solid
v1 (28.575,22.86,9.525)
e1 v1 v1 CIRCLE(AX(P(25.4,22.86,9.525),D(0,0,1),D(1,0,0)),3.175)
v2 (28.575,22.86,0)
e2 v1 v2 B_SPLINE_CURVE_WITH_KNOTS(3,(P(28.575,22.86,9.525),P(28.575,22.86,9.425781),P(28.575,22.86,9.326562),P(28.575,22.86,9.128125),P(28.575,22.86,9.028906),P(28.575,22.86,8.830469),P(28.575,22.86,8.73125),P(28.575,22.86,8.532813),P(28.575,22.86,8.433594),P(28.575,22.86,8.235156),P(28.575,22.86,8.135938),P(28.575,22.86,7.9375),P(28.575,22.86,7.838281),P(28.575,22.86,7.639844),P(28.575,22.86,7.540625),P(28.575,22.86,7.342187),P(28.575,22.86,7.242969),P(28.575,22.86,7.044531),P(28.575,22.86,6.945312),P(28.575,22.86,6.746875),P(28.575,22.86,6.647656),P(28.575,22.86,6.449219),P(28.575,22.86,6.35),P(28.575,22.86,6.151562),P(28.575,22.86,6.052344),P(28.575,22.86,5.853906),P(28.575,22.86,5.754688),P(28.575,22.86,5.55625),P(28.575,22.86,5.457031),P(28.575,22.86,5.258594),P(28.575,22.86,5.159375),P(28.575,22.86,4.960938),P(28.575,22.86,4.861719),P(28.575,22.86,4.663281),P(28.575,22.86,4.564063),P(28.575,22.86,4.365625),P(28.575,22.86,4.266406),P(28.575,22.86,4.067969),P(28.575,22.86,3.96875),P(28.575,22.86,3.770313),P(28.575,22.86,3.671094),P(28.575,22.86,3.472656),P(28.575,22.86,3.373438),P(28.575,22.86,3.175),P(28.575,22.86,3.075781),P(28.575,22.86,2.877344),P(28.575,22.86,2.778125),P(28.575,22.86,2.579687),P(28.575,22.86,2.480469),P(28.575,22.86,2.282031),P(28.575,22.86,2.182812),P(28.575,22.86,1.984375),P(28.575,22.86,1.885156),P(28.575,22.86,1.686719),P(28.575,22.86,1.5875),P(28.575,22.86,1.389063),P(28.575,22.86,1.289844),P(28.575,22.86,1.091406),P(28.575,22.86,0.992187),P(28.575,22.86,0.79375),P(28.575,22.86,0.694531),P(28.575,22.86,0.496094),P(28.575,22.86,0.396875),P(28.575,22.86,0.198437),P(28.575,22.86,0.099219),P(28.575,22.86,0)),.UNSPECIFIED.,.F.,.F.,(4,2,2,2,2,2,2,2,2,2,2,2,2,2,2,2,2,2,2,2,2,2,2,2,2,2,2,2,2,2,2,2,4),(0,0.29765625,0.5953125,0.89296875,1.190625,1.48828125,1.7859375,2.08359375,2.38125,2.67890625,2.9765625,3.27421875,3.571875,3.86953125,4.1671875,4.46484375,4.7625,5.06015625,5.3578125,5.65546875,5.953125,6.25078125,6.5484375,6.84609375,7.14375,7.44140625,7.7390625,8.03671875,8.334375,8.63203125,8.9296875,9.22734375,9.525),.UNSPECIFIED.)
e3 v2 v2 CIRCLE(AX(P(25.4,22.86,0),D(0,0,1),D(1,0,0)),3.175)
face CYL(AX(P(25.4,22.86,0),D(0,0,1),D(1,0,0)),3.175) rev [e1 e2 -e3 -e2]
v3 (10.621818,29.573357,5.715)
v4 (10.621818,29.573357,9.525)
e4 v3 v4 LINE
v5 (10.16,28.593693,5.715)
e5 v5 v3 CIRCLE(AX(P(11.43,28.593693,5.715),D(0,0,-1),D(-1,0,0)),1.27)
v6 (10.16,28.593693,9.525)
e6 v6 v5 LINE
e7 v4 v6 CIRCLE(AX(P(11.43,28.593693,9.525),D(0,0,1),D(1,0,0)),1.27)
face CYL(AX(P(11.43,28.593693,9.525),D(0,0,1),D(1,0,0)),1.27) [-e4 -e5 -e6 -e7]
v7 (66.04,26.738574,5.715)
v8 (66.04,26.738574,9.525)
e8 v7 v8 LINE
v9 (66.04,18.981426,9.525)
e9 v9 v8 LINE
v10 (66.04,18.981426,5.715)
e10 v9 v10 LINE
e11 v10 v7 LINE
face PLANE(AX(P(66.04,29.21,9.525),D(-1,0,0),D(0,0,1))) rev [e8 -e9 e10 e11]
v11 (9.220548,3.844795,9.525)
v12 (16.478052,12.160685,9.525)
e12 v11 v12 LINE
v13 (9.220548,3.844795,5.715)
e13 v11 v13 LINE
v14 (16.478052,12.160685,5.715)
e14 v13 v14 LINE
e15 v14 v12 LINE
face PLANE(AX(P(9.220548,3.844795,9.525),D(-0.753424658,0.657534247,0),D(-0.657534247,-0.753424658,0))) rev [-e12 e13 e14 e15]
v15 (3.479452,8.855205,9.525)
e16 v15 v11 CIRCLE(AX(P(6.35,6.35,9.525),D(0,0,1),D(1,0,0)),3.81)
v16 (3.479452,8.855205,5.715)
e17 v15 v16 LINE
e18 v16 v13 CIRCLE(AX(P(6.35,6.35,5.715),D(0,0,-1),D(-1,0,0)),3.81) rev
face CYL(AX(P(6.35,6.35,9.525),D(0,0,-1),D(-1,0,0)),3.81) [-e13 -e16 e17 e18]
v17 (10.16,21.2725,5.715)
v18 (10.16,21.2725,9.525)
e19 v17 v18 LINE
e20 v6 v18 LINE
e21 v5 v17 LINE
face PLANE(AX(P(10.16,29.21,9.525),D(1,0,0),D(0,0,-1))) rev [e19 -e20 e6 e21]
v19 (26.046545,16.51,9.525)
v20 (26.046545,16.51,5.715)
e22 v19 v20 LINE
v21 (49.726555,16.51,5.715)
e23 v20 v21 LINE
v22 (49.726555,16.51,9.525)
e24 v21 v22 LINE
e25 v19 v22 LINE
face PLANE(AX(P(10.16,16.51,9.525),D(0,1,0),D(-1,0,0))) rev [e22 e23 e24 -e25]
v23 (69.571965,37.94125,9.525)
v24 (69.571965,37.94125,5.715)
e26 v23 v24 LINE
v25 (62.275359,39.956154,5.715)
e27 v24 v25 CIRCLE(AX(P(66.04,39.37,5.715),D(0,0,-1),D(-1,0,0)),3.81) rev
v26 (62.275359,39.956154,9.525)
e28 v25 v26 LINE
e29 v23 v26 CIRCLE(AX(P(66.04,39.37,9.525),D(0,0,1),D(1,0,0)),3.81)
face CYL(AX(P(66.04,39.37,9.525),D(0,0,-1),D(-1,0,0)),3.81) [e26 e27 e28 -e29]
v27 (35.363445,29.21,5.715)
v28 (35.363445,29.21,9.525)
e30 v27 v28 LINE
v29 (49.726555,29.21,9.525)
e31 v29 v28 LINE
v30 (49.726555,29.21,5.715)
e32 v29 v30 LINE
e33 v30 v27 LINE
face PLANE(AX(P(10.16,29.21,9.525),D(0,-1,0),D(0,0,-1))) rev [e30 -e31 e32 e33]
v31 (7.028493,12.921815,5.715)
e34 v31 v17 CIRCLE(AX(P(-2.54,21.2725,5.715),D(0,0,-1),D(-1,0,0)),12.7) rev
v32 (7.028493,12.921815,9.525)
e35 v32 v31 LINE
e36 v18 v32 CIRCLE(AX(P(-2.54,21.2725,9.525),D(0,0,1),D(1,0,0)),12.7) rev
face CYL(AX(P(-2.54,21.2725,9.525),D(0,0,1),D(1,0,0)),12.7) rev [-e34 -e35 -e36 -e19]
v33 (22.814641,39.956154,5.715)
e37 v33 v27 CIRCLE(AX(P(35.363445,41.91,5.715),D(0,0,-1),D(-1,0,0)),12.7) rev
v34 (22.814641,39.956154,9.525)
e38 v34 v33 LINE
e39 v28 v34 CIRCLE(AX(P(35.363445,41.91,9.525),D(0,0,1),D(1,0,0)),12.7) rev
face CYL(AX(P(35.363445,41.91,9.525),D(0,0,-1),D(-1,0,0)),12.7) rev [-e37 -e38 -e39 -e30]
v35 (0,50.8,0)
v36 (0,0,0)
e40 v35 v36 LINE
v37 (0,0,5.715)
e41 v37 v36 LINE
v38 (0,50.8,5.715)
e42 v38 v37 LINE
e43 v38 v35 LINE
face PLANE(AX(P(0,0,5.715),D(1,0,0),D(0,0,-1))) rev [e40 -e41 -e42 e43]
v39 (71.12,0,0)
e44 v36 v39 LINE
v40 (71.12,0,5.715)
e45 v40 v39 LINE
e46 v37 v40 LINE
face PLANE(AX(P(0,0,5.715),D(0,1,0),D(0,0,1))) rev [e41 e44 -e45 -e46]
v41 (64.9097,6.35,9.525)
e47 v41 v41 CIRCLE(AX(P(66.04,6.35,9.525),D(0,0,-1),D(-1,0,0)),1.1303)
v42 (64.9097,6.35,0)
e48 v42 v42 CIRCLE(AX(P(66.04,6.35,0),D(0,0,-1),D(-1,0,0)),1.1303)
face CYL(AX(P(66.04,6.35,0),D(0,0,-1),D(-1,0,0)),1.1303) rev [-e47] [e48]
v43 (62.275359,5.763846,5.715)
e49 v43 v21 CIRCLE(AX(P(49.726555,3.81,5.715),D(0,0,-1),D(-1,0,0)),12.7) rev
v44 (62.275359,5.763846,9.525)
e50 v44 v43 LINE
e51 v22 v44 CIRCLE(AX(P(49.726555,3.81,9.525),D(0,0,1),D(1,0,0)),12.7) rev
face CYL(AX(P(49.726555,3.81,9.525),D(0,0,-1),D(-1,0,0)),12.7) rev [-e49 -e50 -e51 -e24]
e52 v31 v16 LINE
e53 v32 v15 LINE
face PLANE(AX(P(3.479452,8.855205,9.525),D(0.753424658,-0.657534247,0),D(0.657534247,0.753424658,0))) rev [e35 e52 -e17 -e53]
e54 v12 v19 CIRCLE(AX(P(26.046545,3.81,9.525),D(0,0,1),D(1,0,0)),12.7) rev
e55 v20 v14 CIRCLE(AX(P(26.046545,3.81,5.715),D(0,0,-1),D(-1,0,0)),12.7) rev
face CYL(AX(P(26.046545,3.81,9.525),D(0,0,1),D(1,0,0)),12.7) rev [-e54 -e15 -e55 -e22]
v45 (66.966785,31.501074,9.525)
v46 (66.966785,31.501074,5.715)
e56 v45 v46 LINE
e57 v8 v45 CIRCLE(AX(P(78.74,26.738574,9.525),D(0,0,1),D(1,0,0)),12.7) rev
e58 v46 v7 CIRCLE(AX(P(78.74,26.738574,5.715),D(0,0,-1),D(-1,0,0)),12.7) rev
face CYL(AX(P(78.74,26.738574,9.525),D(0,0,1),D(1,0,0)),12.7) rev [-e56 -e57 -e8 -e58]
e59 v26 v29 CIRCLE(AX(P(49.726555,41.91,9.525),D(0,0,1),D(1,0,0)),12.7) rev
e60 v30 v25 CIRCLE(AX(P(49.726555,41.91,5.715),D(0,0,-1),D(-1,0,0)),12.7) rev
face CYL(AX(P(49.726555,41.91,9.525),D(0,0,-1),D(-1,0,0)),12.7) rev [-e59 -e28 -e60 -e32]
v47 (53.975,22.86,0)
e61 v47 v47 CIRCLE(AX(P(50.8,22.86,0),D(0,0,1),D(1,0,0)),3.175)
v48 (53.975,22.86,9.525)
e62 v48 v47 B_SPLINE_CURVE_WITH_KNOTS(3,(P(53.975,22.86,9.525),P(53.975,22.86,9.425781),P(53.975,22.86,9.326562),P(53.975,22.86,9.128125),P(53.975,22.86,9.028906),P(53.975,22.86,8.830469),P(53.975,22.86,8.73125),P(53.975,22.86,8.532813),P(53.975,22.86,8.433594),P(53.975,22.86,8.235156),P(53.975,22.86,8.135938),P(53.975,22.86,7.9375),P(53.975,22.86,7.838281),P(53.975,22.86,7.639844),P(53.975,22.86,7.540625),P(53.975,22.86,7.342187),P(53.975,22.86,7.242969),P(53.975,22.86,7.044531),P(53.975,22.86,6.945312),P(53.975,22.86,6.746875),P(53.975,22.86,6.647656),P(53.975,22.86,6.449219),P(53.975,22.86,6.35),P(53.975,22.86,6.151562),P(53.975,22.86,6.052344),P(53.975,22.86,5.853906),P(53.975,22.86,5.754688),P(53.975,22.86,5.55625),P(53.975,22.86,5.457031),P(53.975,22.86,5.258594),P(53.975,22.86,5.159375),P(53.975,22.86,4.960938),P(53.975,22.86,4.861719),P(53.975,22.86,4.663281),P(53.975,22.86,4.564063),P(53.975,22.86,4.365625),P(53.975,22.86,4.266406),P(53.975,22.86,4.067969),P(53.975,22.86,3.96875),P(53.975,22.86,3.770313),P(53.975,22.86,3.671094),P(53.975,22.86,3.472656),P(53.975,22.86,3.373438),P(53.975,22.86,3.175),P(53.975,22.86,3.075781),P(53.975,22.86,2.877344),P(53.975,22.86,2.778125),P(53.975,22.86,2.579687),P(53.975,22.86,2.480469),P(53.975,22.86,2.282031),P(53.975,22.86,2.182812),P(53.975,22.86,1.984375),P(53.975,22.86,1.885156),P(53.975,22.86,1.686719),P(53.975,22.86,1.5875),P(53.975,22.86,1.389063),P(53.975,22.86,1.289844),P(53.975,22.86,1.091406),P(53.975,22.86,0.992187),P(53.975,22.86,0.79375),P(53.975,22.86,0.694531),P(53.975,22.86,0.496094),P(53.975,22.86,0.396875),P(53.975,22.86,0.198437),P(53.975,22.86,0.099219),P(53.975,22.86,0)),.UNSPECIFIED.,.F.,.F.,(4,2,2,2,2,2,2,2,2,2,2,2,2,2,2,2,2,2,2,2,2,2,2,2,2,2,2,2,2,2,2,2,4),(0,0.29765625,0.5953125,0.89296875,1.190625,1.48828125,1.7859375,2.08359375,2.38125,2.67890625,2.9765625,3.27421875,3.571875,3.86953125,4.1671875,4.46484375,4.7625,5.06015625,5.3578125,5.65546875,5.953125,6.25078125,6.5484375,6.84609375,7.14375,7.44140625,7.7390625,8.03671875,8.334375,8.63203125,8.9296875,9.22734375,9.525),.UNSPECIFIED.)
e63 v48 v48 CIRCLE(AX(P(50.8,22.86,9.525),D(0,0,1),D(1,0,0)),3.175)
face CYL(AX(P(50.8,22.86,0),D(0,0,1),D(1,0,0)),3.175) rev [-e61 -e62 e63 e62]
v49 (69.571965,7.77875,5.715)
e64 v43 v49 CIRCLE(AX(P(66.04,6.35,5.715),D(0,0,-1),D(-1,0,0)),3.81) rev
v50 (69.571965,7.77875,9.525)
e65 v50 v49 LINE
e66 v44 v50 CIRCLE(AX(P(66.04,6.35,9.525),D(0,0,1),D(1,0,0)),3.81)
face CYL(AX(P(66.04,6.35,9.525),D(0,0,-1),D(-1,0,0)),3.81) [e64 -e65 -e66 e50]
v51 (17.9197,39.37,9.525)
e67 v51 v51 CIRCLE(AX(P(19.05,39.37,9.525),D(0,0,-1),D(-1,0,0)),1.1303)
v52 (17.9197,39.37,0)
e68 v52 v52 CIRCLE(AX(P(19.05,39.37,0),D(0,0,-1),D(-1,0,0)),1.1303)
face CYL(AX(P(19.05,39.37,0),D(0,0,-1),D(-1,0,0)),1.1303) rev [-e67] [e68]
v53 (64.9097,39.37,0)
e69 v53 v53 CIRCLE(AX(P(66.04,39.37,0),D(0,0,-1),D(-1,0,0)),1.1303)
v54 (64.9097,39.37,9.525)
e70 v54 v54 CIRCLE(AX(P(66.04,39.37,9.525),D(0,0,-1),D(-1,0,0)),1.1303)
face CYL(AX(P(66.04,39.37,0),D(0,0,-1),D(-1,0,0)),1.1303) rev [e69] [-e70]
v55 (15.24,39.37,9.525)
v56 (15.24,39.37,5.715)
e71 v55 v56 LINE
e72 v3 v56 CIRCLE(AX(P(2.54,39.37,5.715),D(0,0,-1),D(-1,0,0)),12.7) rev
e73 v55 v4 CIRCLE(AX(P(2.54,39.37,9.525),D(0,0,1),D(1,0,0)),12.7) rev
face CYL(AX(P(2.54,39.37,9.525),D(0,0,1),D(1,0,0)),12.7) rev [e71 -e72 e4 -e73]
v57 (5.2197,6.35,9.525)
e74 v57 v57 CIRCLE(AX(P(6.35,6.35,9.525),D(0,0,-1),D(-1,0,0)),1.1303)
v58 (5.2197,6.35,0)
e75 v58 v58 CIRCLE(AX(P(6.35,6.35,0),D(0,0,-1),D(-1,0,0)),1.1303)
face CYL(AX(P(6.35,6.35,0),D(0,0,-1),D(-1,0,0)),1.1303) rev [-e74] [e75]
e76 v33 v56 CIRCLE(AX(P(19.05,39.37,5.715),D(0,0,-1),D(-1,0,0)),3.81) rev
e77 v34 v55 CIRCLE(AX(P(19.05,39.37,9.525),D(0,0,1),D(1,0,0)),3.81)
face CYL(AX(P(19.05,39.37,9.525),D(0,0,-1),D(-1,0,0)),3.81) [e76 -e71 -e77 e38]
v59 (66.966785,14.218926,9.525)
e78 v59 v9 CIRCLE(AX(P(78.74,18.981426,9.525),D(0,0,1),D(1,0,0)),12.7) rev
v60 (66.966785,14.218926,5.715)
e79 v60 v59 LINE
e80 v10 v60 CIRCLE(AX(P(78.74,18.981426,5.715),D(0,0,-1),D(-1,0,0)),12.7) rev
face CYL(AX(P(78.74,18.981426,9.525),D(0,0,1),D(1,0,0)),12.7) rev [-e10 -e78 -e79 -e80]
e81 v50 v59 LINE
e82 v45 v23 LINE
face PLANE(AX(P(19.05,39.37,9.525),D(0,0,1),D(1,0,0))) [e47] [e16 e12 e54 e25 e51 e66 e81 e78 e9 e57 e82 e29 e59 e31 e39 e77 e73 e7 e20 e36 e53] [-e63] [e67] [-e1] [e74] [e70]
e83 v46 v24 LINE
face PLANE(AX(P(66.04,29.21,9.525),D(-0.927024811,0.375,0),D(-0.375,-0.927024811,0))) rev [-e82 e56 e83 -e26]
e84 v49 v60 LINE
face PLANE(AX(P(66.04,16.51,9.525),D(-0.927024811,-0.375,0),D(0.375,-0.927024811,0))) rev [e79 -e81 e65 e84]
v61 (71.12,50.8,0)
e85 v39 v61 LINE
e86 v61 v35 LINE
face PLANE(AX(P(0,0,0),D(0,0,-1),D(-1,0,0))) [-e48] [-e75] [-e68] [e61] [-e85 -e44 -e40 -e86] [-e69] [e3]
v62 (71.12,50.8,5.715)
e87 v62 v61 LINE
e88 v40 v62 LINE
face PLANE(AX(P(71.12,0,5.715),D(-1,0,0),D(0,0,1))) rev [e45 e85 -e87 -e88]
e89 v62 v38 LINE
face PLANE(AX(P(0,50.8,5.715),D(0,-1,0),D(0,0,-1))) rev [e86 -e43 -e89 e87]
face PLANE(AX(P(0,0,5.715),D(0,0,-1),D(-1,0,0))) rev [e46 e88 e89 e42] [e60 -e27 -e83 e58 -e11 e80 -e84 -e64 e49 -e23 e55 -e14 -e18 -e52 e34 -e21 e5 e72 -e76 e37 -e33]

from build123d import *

# Parameters (mm, degrees)
SKETCH1_W               = 71.12
SKETCH1_H               = 50.8
BOSS_EXTRUDE1_DEPTH     = 5.715
SKETCH3_R               = 3.81
SKETCH3_W               = 55.88
SKETCH3_H               = 12.7
BOSS_EXTRUDE2_DEPTH     = 3.81
F_4_40_TAPPED_HOLE1_D   = 2.2606
BOSS_EXTRUDE4_DEPTH     = 3.81
FILLET1_R               = 12.7
FILLET2_R               = 1.27
CUT_EXTRUDE1_DEPTH      = 2.54
CUT_EXTRUDE1_DEPTH_BACK = 88.917120204
SKETCH9_R               = 3.175


with BuildPart() as part:
    # Sketch1 → Boss-Extrude1 (new body)
    with BuildSketch(Plane.XY):
        with Locations((35.56, 25.4)):
            Rectangle(SKETCH1_W, SKETCH1_H)
    extrude(amount=BOSS_EXTRUDE1_DEPTH)

    # Sketch3 → Boss-Extrude2 (add)
    with BuildSketch(Plane.XY.offset(5.715)):
        with Locations(Location((19.05, 39.37, 0), (0, 0, 180))):
            Circle(SKETCH3_R)
        with Locations(Location((66.04, 39.37, 0), (0, 0, 180))):
            Circle(SKETCH3_R)
        with Locations(Location((6.35, 6.35, 0), (0, 0, 180))):
            Circle(SKETCH3_R)
        with Locations(Location((66.04, 6.35, 0), (0, 0, 180))):
            Circle(SKETCH3_R)
        with Locations((38.1, 22.86)):
            Rectangle(SKETCH3_W, SKETCH3_H)
    extrude(amount=BOSS_EXTRUDE2_DEPTH)

    # #4-40 Tapped Hole1 (through all)
    with Locations(Plane(origin=(0, 0, 0), x_dir=(-1, 0, 0), z_dir=(0, 0, -1))):
        with Locations((-66.04, 6.35), (-66.04, 39.37), (-19.05, 39.37), (-6.35, 6.35)):
            Hole(F_4_40_TAPPED_HOLE1_D / 2)

    # Sketch7 → Boss-Extrude4 (add)
    with BuildSketch(Plane.XY.offset(5.715)):
        with BuildLine():
            Line((15.24, 39.37), (15.24, 29.21))
            Line((15.24, 29.21), (22.86, 29.21))
            Line((22.86, 29.21), (22.86, 39.37))
            ThreePointArc((22.86, 39.37), (19.05, 35.56), (15.24, 39.37))
        make_face()
        with BuildLine():
            Line((62.23, 39.37), (62.23, 29.21))
            Line((62.23, 29.21), (66.04, 29.21))
            Line((66.04, 29.21), (69.571964529, 37.94125))
            ThreePointArc((69.571964529, 37.94125), (65.31222423, 35.630154759), (62.23, 39.37))
        make_face()
        with BuildLine():
            Line((3.479452055, 8.855205479), (10.16, 16.51))
            Line((10.16, 16.51), (20.273818182, 16.51))
            Line((20.273818182, 16.51), (9.220547945, 3.844794521))
            ThreePointArc((9.220547945, 3.844794521), (8.855205479, 9.220547945), (3.479452055, 8.855205479))
        make_face()
        with BuildLine():
            Line((62.23, 6.35), (62.23, 16.51))
            Line((62.23, 16.51), (66.04, 16.51))
            Line((66.04, 16.51), (69.571964529, 7.77875))
            ThreePointArc((69.571964529, 7.77875), (65.31222423, 10.089845241), (62.23, 6.35))
        make_face()
    extrude(amount=BOSS_EXTRUDE4_DEPTH)

    # Fillet1
    # the kernel refuses this fillet: 12.7 mm, written as the material it adds along each edge
    with BuildSketch(Plane(origin=(10.16, 16.51, -6.19125), x_dir=(0, 1, 0), z_dir=(0, 0, 1))) as fillet1_piece_1_section:
        with BuildLine():
            CenterArc((FILLET1_R * 0.375, FILLET1_R), FILLET1_R, 228.887909561, 41.112090439)
            Line((-FILLET1_R * 0.282534246575, FILLET1_R * 0.246575342466), (0, 0))
            Line((0, 0), (FILLET1_R * 0.375, 0))
        make_face()
    fillet1_piece_1 = extrude(amount=15.71625, mode=Mode.PRIVATE)
    fillet1_piece_1 = split(fillet1_piece_1, bisect_by=Plane(origin=(9.519597121, 16.75015108, 0), z_dir=(0, 0, 1)), keep=Keep.TOP, mode=Mode.PRIVATE)
    add(fillet1_piece_1)
    with BuildSketch(Plane(origin=(15.24, 29.21, -19.685), x_dir=(0, 1, 0), z_dir=(0, 0, 1))) as fillet1_piece_2_section:
        with BuildLine():
            CenterArc((10.16, 12.7), FILLET1_R, 216.869897646, 53.130102354)
            Line((0, 5.08), (-1.016, 4.318))
            ThreePointArc((-1.016, 4.318), (-1.27, 2.54), (-1.27, 0))
            Line((-1.27, 0), (0, -1.27))
            Line((0, -1.27), (10.16, -1.27))
            Line((10.16, -1.27), (10.16, 0))
        make_face()
    fillet1_piece_2 = extrude(amount=29.21, mode=Mode.PRIVATE)
    fillet1_piece_2 = split(fillet1_piece_2, bisect_by=Plane(origin=(13.921943776, 33.679028112, 0), z_dir=(0, 0, 1)), keep=Keep.TOP, mode=Mode.PRIVATE)
    add(fillet1_piece_2)
    with BuildSketch(Plane(origin=(62.23, 29.21, -25.543613437), x_dir=(0.0042208920727075105, 0.9999910919953791, 0), z_dir=(0, 0, 1))) as fillet1_piece_3_section:
        with BuildLine():
            CenterArc((12.647111175, 12.556939323), FILLET1_R, 180.24184002, 81.150116902)
            Line((-0.052775693, 12.503333994), (-1.32276438, 12.497973461))
            Line((-1.32276438, 12.497973461), (-1.269988687, -0.005360533))
            Line((-1.269988687, -0.005360533), (0.005360533, -1.269988687))
            ThreePointArc((0.005360533, -1.269988687), (10.165270028, -1.227104423), (10.556163414, -1.255693932))
            Line((10.556163414, -1.255693932), (10.746249574, 0))
        make_face()
    fillet1_piece_3 = extrude(amount=35.068613437, mode=Mode.PRIVATE)
    fillet1_piece_3 = split(fillet1_piece_3, bisect_by=Plane(origin=(58.003710065, 32.244364844, 0), z_dir=(0, 0, 1)), keep=Keep.TOP, mode=Mode.PRIVATE)
    add(fillet1_piece_3)
    with BuildSketch(Plane(origin=(22.86, 29.21, -25.543613437), x_dir=(1, 0, 0), z_dir=(0, 0, 1))) as fillet1_piece_4_section:
        with BuildLine():
            CenterArc((12.503445375, 12.7), FILLET1_R, 188.849883098, 81.150116902)
            Line((-0.04535876, 10.746153846), (-1.300239173, 10.550769231))
            ThreePointArc((-1.300239173, 10.550769231), (-1.27, 10.16), (-1.27, 0))
            Line((-1.27, 0), (0, -1.27))
            Line((0, -1.27), (12.503445375, -1.27))
            Line((12.503445375, -1.27), (12.503445375, 0))
        make_face()
    fillet1_piece_4 = extrude(amount=35.068613437, mode=Mode.PRIVATE)
    fillet1_piece_4 = split(fillet1_piece_4, bisect_by=Plane(origin=(27.086289935, 32.244364844, 0), z_dir=(0, 0, 1)), keep=Keep.TOP, mode=Mode.PRIVATE)
    add(fillet1_piece_4)
    with BuildSketch(Plane(origin=(62.23, 16.51, -25.543613437), x_dir=(-1, 0, 0), z_dir=(0, 0, 1))) as fillet1_piece_5_section:
        with BuildLine():
            CenterArc((12.503445375, 12.7), FILLET1_R, 188.849883098, 81.150116902)
            Line((-0.04535876, 10.746153846), (-1.300239173, 10.550769231))
            ThreePointArc((-1.300239173, 10.550769231), (-1.27, 10.16), (-1.27, 0))
            Line((-1.27, 0), (0, -1.27))
            Line((0, -1.27), (12.503445375, -1.27))
            Line((12.503445375, -1.27), (12.503445375, 0))
        make_face()
    fillet1_piece_5 = extrude(amount=35.068613437, mode=Mode.PRIVATE)
    fillet1_piece_5 = split(fillet1_piece_5, bisect_by=Plane(origin=(58.003710065, 13.475635156, 0), z_dir=(0, 0, 1)), keep=Keep.TOP, mode=Mode.PRIVATE)
    add(fillet1_piece_5)
    with BuildSketch(Plane(origin=(20.273818182, 16.51, -8.716818182), x_dir=(-0.6575342465753422, -0.7534246575342469, 0), z_dir=(0, 0, 1))) as fillet1_piece_6_section:
        with BuildLine():
            CenterArc((FILLET1_R * 0.454545454545, FILLET1_R), FILLET1_R, 221.112090439, 48.887909561)
            Line((-FILLET1_R * 0.298879202989, FILLET1_R * 0.342465753425), (0, 0))
            Line((0, 0), (FILLET1_R * 0.454545454545, 0))
        make_face()
    fillet1_piece_6 = extrude(amount=18.241818182, mode=Mode.PRIVATE)
    fillet1_piece_6 = split(fillet1_piece_6, bisect_by=Plane(origin=(20.68190581, 15.612207219, 0), z_dir=(0, 0, 1)), keep=Keep.TOP, mode=Mode.PRIVATE)
    add(fillet1_piece_6)
    with BuildSketch(Plane(origin=(66.04, 29.21, -0.463566012), x_dir=(0, -1, 0), z_dir=(0, 0, 1))) as fillet1_piece_7_section:
        with BuildLine():
            CenterArc((FILLET1_R * 0.194600504301, FILLET1_R), FILLET1_R, 247.975687163, 22.024312837)
            Line((-FILLET1_R * 0.180399495699, FILLET1_R * 0.072975189113), (0, 0))
            Line((0, 0), (FILLET1_R * 0.194600504301, 0))
        make_face()
    fillet1_piece_7 = extrude(amount=9.988566012, mode=Mode.PRIVATE)
    fillet1_piece_7 = split(fillet1_piece_7, bisect_by=Plane(origin=(66.226537553, 29.173699698, 0), z_dir=(0, 0, 1)), keep=Keep.TOP, mode=Mode.PRIVATE)
    add(fillet1_piece_7)
    with BuildSketch(Plane(origin=(66.04, 16.51, -0.463566012), x_dir=(0.37499999999999534, -0.9270248108869598, 0), z_dir=(0, 0, 1))) as fillet1_piece_8_section:
        with BuildLine():
            CenterArc((FILLET1_R * 0.194600504301, FILLET1_R), FILLET1_R, 247.975687163, 22.024312837)
            Line((-FILLET1_R * 0.180399495699, FILLET1_R * 0.072975189113), (0, 0))
            Line((0, 0), (FILLET1_R * 0.194600504301, 0))
        make_face()
    fillet1_piece_8 = extrude(amount=9.988566012, mode=Mode.PRIVATE)
    fillet1_piece_8 = split(fillet1_piece_8, bisect_by=Plane(origin=(66.226537553, 16.546300302, 0), z_dir=(0, 0, 1)), keep=Keep.TOP, mode=Mode.PRIVATE)
    add(fillet1_piece_8)

    # Fillet2
    fillet2_edges = [part.edges().sort_by_distance(p)[0] for p in [
        (10.16, 29.21, 7.62),
    ]]
    fillet(fillet2_edges, radius=FILLET2_R)

    # Sketch9 → Cut-Extrude1 (cut, two sides: drawn at the far end of the back side and taken through both)
    with BuildSketch(Plane.XY.offset(9.525).offset(-CUT_EXTRUDE1_DEPTH_BACK)):
        with Locations((25.4, 22.86)):
            Circle(SKETCH9_R)
        with Locations((50.8, 22.86)):
            Circle(SKETCH9_R)
    extrude(amount=CUT_EXTRUDE1_DEPTH + CUT_EXTRUDE1_DEPTH_BACK, mode=Mode.SUBTRACT)


solid = part.part
